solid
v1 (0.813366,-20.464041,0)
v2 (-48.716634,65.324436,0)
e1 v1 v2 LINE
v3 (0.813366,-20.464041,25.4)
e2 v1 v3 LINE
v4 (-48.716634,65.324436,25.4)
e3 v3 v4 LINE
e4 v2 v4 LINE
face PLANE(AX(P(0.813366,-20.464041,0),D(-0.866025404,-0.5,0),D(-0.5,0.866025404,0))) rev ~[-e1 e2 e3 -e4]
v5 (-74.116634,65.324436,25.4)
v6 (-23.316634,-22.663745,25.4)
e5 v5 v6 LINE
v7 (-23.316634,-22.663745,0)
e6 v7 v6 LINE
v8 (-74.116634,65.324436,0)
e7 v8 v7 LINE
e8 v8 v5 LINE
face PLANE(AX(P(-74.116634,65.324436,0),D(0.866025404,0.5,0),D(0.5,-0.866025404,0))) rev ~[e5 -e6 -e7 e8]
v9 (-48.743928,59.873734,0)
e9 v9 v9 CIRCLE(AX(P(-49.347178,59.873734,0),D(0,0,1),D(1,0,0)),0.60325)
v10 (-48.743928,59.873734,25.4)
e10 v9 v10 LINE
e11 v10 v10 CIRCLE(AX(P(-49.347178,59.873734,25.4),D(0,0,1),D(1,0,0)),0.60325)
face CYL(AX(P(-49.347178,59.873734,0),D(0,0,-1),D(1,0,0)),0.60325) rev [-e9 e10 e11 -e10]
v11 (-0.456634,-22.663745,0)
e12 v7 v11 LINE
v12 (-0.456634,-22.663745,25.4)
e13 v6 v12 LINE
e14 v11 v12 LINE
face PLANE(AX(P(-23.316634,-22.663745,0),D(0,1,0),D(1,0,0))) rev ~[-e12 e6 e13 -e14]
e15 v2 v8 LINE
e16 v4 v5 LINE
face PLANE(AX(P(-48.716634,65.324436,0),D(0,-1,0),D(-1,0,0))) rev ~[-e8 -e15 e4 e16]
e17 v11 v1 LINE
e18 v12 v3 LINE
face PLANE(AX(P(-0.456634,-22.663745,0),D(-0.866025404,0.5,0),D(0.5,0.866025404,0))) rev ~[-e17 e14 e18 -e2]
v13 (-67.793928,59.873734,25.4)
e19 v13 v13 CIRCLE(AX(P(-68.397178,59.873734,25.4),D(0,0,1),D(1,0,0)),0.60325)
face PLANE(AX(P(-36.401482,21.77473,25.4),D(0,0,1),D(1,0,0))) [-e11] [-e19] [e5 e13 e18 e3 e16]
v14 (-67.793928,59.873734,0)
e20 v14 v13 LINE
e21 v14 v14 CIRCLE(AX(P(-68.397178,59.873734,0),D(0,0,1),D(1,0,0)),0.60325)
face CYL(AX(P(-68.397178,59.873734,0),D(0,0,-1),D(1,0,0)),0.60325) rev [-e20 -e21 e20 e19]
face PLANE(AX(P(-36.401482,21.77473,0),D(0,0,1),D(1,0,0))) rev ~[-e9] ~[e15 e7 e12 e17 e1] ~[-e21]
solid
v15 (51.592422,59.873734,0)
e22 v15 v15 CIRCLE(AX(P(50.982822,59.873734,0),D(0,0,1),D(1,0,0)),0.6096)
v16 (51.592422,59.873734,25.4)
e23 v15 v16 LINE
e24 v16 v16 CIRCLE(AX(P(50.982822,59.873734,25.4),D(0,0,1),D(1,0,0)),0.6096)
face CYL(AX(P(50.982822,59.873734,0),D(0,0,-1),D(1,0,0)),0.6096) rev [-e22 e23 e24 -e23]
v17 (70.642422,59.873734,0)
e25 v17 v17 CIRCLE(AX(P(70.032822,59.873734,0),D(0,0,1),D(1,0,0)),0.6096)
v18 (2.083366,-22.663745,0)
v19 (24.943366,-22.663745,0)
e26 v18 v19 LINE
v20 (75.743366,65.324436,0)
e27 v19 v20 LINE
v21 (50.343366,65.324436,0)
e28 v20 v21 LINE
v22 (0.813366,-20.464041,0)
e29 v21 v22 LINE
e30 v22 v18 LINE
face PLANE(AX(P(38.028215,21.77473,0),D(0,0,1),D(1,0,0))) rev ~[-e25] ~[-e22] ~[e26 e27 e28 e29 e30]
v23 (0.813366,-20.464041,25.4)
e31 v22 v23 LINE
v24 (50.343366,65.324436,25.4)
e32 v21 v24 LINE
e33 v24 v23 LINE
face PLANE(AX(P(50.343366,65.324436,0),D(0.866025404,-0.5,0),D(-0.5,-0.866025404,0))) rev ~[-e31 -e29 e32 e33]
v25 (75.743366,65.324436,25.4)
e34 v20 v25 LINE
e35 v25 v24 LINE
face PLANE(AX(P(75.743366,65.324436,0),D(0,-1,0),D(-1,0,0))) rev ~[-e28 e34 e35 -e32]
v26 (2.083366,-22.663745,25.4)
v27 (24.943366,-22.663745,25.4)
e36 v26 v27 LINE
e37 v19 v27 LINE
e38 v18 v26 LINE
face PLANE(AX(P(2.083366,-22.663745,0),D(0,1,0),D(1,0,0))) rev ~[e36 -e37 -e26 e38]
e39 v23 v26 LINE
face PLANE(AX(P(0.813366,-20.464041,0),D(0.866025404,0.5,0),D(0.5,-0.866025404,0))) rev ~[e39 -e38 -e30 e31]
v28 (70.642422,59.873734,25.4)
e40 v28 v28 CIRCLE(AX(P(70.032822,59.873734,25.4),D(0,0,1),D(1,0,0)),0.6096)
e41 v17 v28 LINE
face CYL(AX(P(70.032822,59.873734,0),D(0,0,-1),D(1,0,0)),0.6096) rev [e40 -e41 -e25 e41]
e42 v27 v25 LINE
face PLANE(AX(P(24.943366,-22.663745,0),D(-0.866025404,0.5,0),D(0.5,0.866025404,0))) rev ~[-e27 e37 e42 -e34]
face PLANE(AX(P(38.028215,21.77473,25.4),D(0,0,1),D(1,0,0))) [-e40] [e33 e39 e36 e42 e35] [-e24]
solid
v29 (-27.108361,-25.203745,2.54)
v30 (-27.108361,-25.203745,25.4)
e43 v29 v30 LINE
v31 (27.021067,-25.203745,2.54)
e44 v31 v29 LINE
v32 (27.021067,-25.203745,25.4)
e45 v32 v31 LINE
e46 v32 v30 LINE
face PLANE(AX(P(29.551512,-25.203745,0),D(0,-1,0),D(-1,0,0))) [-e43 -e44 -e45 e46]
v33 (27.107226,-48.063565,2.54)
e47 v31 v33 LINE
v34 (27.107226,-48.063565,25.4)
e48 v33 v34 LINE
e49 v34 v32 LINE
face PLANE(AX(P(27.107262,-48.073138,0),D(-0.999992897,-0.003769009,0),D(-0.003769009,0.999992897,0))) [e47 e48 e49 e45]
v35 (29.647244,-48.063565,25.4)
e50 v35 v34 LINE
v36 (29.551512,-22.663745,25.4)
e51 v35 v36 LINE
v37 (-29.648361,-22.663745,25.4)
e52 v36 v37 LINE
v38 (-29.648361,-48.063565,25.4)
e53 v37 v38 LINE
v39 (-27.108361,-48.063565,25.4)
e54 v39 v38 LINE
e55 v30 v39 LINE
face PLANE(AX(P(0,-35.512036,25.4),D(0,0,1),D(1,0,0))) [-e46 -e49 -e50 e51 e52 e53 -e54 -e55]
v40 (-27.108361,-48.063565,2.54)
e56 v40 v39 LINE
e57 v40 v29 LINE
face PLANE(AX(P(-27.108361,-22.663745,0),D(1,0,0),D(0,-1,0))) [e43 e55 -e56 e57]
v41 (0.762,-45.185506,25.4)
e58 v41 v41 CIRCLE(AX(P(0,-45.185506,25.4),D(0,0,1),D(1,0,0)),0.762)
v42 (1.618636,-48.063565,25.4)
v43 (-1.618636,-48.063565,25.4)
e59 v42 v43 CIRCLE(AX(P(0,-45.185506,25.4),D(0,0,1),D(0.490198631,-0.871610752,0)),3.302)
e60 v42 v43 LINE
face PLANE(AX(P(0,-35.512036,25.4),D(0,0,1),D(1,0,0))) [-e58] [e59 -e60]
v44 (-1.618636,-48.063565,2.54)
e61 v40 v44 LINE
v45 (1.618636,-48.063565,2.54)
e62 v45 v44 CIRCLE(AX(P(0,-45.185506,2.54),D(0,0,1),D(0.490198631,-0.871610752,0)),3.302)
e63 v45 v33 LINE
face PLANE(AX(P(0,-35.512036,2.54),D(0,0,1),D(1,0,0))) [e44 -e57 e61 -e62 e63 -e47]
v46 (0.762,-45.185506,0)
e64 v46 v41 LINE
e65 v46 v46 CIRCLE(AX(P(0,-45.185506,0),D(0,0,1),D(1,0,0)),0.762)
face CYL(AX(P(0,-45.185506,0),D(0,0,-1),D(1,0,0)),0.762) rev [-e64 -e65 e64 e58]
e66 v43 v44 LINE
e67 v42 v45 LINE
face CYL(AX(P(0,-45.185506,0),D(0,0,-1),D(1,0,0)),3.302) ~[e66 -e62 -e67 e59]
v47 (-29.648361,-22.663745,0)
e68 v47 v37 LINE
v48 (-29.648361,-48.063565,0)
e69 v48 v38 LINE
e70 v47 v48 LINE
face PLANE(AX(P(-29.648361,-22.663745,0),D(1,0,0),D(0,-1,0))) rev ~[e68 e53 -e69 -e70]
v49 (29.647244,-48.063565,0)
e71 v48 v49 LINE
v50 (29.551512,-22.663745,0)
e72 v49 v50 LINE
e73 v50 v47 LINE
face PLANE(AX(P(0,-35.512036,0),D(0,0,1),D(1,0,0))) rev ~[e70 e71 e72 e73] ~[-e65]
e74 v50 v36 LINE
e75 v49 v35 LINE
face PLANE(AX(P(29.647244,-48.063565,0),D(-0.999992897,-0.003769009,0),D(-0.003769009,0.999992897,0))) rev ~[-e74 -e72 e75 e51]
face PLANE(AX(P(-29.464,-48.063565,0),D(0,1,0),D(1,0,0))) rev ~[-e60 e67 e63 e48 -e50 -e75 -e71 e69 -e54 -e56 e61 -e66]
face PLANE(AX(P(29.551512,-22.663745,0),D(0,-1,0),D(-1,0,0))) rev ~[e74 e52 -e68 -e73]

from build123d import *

# Parameters (mm, degrees)
F0_R     = 0.60325
F1_DEPTH = 25.4
F0_R_2   = 0.6096
F2_DEPTH = 25.4
F0_W     = 58.928
F0_H     = 25.1030587018
F0_R_3   = 0.762
F3_DEPTH = 25.4
F4_T     = 2.54


# Not quite as in the source:
# - a shell that OpenCascade refuses in one call is made with other operations: the cavity is built on its own and cut out


with BuildPart() as f1:
    # F0 (on Top) → F1 (new body)
    with BuildSketch(Plane.XY):
        Polygon((-74.1166336828, 65.3244355693), (-23.3166336828, -22.6637454552), (-0.4566336828, -22.6637454552), (0.8133663172, -20.4640409296), (-48.7166336828, 65.3244355693), align=None)
        with Locations((-68.3971781588, 59.8737336695)):
            Circle(F0_R, mode=Mode.SUBTRACT)
        with Locations((-49.3471781588, 59.8737336695)):
            Circle(F0_R, mode=Mode.SUBTRACT)
    extrude(amount=F1_DEPTH)


with BuildPart() as f1b:
    # F0 (on Top) → F1, piece 2 (new body)
    with BuildSketch(Plane.XY):
        Polygon((0.8133663172, -20.4640409296), (2.0833663172, -22.6637454552), (24.9433663172, -22.6637454552), (75.7433663172, 65.3244355693), (50.3433663172, 65.3244355693), align=None)
        with Locations((50.9828218412, 59.8737336695)):
            Circle(F0_R_2, mode=Mode.SUBTRACT)
        with Locations((70.0328218412, 59.8737336695)):
            Circle(F0_R_2, mode=Mode.SUBTRACT)
    extrude(amount=F1_DEPTH)


with BuildPart() as f2:
    # F0 (on Top) → F2 (new body)
    with BuildSketch(Plane.XY):
        Polygon((-23.3166336828, -22.6637454552), (-29.6483605915, -22.6637454552), (-29.6483605915, -48.0635650456), (-29.464, -48.0635650456), (-29.464, -22.9605063438), (29.464, -22.9605063438), (29.464, -48.0635650456), (29.6472443531, -48.0635650456), (29.5515115134, -22.6637454552), (24.9433663172, -22.6637454552), (2.0833663172, -22.6637454552), (-0.4566336828, -22.6637454552), align=None)
    extrude(amount=F2_DEPTH)

    # F0 (on Top) → F3 (join)
    with BuildSketch(Plane.XY):
        with Locations((0, -35.5120356947)):
            Rectangle(F0_W, F0_H)
        with Locations((0, -45.1855063438)):
            Circle(F0_R_3, mode=Mode.SUBTRACT)
    extrude(amount=F3_DEPTH)

    # F4: shell of thickness 2.54, made by hand


with BuildPart() as f4_core1:
    # F4_t2: copy of F2
    add(f2.part)

    # the walls: a layer under each face that stays
    f4_faces = [f4_core1.faces().sort_by_distance(p)[0] for p in [
        (-0.048424539, -22.6637454552, 12.7),
        (-0.0005581192, -35.3636552504, 0),
        (-0.762, -45.1855063438, 12.7),
        (-29.6483605915, -35.3636552504, 12.7),
        (29.5993779332, -35.3636552504, 12.7),
    ]]
    thicken(f4_faces, amount=-F4_T, mode=Mode.SUBTRACT)


with BuildPart() as f2_1:
    add(f2.part)

    # what is left inside the walls is the cavity
    f4_cavity = [f4_core1.part.solids().sort_by_distance(p)[0] for p in [
        (-0.043647, -25.229145, 17.78),
    ]]
    add(f4_cavity, mode=Mode.SUBTRACT)


solid = Compound([f1.part, f1b.part, f2_1.part])
